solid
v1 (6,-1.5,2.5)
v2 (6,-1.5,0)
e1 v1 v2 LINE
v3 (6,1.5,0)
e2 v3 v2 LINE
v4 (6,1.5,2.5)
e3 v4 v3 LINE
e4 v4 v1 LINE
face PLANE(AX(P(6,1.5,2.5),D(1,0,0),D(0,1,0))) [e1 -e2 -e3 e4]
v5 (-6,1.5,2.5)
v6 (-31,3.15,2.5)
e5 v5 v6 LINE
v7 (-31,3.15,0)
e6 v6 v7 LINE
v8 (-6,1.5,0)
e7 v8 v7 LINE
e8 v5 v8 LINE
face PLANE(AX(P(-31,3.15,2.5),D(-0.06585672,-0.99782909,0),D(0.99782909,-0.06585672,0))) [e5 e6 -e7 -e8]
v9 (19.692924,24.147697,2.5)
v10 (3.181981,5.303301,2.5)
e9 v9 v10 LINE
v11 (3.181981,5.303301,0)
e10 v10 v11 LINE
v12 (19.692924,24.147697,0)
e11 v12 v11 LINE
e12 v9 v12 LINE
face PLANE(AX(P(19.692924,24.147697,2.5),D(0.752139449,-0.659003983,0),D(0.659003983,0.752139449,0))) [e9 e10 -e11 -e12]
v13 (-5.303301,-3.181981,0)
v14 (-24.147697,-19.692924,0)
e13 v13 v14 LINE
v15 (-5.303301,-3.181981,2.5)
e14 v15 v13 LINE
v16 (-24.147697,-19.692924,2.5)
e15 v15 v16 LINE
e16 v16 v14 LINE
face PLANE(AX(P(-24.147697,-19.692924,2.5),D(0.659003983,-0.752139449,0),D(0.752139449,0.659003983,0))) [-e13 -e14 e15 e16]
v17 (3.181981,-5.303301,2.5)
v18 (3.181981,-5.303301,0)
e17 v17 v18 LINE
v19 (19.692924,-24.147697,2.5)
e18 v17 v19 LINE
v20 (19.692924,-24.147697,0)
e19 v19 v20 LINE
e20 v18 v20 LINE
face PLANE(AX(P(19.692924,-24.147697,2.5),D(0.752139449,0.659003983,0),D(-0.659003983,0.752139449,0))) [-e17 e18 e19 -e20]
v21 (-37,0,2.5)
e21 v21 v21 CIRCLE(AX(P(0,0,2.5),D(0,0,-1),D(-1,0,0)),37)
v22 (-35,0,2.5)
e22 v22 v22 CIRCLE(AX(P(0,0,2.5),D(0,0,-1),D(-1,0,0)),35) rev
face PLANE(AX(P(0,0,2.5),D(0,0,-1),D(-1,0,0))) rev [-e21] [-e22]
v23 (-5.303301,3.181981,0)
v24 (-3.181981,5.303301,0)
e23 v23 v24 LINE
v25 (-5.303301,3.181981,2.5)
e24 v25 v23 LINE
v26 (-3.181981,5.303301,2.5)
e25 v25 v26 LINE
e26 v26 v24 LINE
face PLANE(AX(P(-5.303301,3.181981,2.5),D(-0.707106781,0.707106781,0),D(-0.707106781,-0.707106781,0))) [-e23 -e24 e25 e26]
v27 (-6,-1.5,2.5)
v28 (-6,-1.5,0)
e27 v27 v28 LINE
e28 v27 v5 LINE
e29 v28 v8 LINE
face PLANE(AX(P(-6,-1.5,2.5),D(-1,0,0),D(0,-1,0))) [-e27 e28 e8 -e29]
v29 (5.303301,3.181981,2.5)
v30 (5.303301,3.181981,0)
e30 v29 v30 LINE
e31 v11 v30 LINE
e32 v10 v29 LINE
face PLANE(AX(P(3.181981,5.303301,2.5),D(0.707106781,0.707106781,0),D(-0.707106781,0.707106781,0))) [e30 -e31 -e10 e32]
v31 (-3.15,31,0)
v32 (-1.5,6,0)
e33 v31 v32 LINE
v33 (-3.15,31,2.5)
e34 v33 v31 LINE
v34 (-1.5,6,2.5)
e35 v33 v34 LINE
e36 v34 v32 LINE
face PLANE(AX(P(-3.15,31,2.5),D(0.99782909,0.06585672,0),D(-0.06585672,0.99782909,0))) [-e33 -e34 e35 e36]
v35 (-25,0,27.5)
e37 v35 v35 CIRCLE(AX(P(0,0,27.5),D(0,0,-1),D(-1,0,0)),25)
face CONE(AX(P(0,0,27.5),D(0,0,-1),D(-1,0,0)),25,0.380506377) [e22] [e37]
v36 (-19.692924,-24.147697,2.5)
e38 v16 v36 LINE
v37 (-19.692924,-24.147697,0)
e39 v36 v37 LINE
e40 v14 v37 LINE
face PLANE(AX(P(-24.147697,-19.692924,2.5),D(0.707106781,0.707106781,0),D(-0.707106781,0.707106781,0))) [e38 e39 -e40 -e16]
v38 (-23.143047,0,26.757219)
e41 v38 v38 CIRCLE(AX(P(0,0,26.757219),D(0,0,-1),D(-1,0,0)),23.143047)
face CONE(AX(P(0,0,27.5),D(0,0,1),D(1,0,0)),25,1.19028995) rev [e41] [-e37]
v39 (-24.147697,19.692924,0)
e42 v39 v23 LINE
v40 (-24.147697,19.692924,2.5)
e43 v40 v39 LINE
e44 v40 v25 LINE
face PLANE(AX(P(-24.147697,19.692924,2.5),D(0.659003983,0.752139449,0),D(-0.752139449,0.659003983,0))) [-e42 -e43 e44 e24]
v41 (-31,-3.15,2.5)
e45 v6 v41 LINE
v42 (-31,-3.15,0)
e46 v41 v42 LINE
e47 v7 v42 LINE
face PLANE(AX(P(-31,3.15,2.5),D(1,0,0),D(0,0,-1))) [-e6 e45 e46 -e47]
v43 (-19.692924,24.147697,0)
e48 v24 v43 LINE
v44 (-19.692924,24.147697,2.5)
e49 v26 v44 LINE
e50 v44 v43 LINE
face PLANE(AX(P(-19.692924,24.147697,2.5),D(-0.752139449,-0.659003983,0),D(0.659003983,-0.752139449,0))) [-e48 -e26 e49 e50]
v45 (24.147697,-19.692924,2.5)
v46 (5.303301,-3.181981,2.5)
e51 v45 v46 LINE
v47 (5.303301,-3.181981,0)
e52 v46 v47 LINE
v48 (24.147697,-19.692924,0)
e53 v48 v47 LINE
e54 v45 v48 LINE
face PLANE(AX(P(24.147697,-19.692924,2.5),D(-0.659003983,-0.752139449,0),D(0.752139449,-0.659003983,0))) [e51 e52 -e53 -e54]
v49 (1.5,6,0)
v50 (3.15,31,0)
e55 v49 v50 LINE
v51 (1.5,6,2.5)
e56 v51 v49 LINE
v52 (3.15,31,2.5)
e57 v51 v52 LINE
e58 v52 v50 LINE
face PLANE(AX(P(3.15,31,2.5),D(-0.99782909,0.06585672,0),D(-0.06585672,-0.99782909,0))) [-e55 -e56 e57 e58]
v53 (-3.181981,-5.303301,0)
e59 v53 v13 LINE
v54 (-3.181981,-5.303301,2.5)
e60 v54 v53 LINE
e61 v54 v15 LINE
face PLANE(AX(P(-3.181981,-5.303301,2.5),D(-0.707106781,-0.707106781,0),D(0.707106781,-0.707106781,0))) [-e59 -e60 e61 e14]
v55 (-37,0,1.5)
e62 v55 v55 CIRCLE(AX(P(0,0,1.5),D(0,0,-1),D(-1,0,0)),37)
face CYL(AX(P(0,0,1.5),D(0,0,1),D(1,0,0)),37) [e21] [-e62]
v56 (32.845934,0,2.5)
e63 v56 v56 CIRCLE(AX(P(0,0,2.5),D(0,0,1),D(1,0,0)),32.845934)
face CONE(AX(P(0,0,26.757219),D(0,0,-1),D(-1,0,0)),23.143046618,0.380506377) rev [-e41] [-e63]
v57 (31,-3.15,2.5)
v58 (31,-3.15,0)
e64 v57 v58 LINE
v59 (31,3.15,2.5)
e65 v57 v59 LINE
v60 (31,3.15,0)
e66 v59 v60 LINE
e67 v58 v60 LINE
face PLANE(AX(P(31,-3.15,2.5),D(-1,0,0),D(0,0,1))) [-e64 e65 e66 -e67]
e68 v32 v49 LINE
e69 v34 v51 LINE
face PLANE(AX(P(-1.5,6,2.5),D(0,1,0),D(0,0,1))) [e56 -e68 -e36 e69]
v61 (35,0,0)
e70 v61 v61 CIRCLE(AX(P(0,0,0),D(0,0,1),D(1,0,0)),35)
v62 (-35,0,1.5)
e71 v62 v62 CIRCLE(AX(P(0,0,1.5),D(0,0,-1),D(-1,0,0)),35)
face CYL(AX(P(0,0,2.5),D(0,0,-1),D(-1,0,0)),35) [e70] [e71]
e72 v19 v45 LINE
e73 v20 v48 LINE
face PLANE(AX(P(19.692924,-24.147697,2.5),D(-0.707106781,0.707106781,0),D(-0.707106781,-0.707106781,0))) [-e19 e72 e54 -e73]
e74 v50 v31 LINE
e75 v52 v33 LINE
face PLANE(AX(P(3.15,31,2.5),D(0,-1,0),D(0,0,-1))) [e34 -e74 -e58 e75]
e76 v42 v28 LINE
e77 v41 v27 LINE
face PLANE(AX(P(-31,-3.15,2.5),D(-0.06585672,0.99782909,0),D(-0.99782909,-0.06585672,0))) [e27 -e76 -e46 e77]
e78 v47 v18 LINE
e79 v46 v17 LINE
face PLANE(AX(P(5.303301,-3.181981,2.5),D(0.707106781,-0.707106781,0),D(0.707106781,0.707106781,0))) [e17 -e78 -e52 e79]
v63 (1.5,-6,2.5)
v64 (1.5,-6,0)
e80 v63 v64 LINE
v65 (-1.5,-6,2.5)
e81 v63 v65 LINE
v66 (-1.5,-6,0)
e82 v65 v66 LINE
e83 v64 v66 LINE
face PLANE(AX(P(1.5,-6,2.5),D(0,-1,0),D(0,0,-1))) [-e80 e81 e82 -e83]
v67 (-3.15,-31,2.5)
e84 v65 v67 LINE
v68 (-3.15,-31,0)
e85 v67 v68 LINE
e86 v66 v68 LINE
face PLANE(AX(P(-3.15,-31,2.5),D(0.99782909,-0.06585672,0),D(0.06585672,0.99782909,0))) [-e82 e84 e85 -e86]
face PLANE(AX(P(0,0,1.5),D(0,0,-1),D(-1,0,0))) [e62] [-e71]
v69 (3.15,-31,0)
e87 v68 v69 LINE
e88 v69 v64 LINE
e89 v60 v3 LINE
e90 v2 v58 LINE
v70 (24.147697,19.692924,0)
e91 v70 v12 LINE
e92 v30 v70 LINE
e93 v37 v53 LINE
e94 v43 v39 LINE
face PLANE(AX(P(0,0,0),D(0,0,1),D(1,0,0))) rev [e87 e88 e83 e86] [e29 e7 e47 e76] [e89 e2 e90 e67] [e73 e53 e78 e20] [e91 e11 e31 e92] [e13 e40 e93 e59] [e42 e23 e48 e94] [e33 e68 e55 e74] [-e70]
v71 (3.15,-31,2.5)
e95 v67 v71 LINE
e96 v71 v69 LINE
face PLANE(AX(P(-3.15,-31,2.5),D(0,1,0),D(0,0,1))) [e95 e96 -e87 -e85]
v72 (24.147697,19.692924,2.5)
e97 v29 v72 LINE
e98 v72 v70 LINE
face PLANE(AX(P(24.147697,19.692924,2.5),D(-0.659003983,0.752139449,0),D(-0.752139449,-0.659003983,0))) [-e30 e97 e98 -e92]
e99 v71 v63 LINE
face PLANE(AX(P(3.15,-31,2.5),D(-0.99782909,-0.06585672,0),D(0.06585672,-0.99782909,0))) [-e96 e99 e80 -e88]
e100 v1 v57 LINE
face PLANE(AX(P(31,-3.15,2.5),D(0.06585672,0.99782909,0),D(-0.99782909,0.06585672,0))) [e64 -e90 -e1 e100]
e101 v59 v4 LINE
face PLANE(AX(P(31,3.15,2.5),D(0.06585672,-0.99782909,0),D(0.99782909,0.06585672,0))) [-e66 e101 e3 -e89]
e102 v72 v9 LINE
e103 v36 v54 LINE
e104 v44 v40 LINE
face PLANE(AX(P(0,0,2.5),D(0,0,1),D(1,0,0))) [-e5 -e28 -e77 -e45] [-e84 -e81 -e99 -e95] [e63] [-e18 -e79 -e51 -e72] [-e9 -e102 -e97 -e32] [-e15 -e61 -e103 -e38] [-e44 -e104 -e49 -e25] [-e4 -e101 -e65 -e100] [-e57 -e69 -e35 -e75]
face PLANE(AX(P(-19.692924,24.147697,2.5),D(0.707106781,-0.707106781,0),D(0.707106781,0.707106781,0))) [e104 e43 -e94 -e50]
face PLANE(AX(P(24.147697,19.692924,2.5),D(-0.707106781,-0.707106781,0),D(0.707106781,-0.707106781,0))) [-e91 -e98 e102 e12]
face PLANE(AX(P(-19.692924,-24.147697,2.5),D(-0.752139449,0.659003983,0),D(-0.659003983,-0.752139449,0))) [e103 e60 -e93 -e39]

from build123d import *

# Parameters (mm, degrees)
BOSS_EXTRUDE1_OUTLINE_R = 35
BOSS_EXTRUDE1_DEPTH     = 2.5
THICKEN1_T2             = 2
SKETCH7_R               = 37
SKETCH7_R_2             = 33.5
BOSS_EXTRUDE2_DEPTH     = 1


# Read off the part's stored shape, not the designer's step: Boss-Extrude1
with BuildPart() as part:
    # Boss-Extrude1 outline → Boss-Extrude1 (new body)
    with BuildSketch(Plane.XY):
        Circle(BOSS_EXTRUDE1_OUTLINE_R)
        Polygon((-3.181980515, -5.303300859), (-19.692923856, -24.147696578), (-24.147696578, -19.692923856), (-5.303300859, -3.181980515), align=None, mode=Mode.SUBTRACT)
        Polygon((1.5, -6), (3.15, -31), (-3.15, -31), (-1.5, -6), align=None, mode=Mode.SUBTRACT)
        Polygon((5.303300859, -3.181980515), (24.147696578, -19.692923856), (19.692923856, -24.147696578), (3.181980515, -5.303300859), align=None, mode=Mode.SUBTRACT)
        Polygon((-6, -1.5), (-31, -3.15), (-31, 3.15), (-6, 1.5), align=None, mode=Mode.SUBTRACT)
        Polygon((-5.303300859, 3.181980515), (-24.147696578, 19.692923856), (-19.692923856, 24.147696578), (-3.181980515, 5.303300859), align=None, mode=Mode.SUBTRACT)
        Polygon((3.181980515, 5.303300859), (19.692923856, 24.147696578), (24.147696578, 19.692923856), (5.303300859, 3.181980515), align=None, mode=Mode.SUBTRACT)
        Polygon((6, 1.5), (31, 3.15), (31, -3.15), (6, -1.5), align=None, mode=Mode.SUBTRACT)
        Polygon((1.5, 6), (-1.5, 6), (-3.15, 31), (3.15, 31), align=None, mode=Mode.SUBTRACT)
    extrude(amount=BOSS_EXTRUDE1_DEPTH)

    # Surface-Loft3: a surface lofted through 2 sketches
    with BuildLine(Plane.XY.offset(2.5), mode=Mode.PRIVATE) as surface_loft3_1_s0:
        CenterArc((0, 0), 35, 0, 360)
    with BuildLine(Plane.XY.offset(27.5), mode=Mode.PRIVATE) as surface_loft3_1_s1:
        CenterArc((0, 0), 25, 0, 360)
    surface_loft3_1 = Shell.make_loft([surface_loft3_1_s0.wire(), surface_loft3_1_s1.wire()])
    add(Solid.thicken(surface_loft3_1, -THICKEN1_T2))

    # Sketch7 → Boss-Extrude2 (add)
    with BuildSketch(Plane(origin=(0, 0, 2.5), x_dir=(-1, 0, 0), z_dir=(0, 0, -1))):
        Circle(SKETCH7_R)
        Circle(SKETCH7_R_2, mode=Mode.SUBTRACT)
    extrude(amount=BOSS_EXTRUDE2_DEPTH)


solid = part.part
